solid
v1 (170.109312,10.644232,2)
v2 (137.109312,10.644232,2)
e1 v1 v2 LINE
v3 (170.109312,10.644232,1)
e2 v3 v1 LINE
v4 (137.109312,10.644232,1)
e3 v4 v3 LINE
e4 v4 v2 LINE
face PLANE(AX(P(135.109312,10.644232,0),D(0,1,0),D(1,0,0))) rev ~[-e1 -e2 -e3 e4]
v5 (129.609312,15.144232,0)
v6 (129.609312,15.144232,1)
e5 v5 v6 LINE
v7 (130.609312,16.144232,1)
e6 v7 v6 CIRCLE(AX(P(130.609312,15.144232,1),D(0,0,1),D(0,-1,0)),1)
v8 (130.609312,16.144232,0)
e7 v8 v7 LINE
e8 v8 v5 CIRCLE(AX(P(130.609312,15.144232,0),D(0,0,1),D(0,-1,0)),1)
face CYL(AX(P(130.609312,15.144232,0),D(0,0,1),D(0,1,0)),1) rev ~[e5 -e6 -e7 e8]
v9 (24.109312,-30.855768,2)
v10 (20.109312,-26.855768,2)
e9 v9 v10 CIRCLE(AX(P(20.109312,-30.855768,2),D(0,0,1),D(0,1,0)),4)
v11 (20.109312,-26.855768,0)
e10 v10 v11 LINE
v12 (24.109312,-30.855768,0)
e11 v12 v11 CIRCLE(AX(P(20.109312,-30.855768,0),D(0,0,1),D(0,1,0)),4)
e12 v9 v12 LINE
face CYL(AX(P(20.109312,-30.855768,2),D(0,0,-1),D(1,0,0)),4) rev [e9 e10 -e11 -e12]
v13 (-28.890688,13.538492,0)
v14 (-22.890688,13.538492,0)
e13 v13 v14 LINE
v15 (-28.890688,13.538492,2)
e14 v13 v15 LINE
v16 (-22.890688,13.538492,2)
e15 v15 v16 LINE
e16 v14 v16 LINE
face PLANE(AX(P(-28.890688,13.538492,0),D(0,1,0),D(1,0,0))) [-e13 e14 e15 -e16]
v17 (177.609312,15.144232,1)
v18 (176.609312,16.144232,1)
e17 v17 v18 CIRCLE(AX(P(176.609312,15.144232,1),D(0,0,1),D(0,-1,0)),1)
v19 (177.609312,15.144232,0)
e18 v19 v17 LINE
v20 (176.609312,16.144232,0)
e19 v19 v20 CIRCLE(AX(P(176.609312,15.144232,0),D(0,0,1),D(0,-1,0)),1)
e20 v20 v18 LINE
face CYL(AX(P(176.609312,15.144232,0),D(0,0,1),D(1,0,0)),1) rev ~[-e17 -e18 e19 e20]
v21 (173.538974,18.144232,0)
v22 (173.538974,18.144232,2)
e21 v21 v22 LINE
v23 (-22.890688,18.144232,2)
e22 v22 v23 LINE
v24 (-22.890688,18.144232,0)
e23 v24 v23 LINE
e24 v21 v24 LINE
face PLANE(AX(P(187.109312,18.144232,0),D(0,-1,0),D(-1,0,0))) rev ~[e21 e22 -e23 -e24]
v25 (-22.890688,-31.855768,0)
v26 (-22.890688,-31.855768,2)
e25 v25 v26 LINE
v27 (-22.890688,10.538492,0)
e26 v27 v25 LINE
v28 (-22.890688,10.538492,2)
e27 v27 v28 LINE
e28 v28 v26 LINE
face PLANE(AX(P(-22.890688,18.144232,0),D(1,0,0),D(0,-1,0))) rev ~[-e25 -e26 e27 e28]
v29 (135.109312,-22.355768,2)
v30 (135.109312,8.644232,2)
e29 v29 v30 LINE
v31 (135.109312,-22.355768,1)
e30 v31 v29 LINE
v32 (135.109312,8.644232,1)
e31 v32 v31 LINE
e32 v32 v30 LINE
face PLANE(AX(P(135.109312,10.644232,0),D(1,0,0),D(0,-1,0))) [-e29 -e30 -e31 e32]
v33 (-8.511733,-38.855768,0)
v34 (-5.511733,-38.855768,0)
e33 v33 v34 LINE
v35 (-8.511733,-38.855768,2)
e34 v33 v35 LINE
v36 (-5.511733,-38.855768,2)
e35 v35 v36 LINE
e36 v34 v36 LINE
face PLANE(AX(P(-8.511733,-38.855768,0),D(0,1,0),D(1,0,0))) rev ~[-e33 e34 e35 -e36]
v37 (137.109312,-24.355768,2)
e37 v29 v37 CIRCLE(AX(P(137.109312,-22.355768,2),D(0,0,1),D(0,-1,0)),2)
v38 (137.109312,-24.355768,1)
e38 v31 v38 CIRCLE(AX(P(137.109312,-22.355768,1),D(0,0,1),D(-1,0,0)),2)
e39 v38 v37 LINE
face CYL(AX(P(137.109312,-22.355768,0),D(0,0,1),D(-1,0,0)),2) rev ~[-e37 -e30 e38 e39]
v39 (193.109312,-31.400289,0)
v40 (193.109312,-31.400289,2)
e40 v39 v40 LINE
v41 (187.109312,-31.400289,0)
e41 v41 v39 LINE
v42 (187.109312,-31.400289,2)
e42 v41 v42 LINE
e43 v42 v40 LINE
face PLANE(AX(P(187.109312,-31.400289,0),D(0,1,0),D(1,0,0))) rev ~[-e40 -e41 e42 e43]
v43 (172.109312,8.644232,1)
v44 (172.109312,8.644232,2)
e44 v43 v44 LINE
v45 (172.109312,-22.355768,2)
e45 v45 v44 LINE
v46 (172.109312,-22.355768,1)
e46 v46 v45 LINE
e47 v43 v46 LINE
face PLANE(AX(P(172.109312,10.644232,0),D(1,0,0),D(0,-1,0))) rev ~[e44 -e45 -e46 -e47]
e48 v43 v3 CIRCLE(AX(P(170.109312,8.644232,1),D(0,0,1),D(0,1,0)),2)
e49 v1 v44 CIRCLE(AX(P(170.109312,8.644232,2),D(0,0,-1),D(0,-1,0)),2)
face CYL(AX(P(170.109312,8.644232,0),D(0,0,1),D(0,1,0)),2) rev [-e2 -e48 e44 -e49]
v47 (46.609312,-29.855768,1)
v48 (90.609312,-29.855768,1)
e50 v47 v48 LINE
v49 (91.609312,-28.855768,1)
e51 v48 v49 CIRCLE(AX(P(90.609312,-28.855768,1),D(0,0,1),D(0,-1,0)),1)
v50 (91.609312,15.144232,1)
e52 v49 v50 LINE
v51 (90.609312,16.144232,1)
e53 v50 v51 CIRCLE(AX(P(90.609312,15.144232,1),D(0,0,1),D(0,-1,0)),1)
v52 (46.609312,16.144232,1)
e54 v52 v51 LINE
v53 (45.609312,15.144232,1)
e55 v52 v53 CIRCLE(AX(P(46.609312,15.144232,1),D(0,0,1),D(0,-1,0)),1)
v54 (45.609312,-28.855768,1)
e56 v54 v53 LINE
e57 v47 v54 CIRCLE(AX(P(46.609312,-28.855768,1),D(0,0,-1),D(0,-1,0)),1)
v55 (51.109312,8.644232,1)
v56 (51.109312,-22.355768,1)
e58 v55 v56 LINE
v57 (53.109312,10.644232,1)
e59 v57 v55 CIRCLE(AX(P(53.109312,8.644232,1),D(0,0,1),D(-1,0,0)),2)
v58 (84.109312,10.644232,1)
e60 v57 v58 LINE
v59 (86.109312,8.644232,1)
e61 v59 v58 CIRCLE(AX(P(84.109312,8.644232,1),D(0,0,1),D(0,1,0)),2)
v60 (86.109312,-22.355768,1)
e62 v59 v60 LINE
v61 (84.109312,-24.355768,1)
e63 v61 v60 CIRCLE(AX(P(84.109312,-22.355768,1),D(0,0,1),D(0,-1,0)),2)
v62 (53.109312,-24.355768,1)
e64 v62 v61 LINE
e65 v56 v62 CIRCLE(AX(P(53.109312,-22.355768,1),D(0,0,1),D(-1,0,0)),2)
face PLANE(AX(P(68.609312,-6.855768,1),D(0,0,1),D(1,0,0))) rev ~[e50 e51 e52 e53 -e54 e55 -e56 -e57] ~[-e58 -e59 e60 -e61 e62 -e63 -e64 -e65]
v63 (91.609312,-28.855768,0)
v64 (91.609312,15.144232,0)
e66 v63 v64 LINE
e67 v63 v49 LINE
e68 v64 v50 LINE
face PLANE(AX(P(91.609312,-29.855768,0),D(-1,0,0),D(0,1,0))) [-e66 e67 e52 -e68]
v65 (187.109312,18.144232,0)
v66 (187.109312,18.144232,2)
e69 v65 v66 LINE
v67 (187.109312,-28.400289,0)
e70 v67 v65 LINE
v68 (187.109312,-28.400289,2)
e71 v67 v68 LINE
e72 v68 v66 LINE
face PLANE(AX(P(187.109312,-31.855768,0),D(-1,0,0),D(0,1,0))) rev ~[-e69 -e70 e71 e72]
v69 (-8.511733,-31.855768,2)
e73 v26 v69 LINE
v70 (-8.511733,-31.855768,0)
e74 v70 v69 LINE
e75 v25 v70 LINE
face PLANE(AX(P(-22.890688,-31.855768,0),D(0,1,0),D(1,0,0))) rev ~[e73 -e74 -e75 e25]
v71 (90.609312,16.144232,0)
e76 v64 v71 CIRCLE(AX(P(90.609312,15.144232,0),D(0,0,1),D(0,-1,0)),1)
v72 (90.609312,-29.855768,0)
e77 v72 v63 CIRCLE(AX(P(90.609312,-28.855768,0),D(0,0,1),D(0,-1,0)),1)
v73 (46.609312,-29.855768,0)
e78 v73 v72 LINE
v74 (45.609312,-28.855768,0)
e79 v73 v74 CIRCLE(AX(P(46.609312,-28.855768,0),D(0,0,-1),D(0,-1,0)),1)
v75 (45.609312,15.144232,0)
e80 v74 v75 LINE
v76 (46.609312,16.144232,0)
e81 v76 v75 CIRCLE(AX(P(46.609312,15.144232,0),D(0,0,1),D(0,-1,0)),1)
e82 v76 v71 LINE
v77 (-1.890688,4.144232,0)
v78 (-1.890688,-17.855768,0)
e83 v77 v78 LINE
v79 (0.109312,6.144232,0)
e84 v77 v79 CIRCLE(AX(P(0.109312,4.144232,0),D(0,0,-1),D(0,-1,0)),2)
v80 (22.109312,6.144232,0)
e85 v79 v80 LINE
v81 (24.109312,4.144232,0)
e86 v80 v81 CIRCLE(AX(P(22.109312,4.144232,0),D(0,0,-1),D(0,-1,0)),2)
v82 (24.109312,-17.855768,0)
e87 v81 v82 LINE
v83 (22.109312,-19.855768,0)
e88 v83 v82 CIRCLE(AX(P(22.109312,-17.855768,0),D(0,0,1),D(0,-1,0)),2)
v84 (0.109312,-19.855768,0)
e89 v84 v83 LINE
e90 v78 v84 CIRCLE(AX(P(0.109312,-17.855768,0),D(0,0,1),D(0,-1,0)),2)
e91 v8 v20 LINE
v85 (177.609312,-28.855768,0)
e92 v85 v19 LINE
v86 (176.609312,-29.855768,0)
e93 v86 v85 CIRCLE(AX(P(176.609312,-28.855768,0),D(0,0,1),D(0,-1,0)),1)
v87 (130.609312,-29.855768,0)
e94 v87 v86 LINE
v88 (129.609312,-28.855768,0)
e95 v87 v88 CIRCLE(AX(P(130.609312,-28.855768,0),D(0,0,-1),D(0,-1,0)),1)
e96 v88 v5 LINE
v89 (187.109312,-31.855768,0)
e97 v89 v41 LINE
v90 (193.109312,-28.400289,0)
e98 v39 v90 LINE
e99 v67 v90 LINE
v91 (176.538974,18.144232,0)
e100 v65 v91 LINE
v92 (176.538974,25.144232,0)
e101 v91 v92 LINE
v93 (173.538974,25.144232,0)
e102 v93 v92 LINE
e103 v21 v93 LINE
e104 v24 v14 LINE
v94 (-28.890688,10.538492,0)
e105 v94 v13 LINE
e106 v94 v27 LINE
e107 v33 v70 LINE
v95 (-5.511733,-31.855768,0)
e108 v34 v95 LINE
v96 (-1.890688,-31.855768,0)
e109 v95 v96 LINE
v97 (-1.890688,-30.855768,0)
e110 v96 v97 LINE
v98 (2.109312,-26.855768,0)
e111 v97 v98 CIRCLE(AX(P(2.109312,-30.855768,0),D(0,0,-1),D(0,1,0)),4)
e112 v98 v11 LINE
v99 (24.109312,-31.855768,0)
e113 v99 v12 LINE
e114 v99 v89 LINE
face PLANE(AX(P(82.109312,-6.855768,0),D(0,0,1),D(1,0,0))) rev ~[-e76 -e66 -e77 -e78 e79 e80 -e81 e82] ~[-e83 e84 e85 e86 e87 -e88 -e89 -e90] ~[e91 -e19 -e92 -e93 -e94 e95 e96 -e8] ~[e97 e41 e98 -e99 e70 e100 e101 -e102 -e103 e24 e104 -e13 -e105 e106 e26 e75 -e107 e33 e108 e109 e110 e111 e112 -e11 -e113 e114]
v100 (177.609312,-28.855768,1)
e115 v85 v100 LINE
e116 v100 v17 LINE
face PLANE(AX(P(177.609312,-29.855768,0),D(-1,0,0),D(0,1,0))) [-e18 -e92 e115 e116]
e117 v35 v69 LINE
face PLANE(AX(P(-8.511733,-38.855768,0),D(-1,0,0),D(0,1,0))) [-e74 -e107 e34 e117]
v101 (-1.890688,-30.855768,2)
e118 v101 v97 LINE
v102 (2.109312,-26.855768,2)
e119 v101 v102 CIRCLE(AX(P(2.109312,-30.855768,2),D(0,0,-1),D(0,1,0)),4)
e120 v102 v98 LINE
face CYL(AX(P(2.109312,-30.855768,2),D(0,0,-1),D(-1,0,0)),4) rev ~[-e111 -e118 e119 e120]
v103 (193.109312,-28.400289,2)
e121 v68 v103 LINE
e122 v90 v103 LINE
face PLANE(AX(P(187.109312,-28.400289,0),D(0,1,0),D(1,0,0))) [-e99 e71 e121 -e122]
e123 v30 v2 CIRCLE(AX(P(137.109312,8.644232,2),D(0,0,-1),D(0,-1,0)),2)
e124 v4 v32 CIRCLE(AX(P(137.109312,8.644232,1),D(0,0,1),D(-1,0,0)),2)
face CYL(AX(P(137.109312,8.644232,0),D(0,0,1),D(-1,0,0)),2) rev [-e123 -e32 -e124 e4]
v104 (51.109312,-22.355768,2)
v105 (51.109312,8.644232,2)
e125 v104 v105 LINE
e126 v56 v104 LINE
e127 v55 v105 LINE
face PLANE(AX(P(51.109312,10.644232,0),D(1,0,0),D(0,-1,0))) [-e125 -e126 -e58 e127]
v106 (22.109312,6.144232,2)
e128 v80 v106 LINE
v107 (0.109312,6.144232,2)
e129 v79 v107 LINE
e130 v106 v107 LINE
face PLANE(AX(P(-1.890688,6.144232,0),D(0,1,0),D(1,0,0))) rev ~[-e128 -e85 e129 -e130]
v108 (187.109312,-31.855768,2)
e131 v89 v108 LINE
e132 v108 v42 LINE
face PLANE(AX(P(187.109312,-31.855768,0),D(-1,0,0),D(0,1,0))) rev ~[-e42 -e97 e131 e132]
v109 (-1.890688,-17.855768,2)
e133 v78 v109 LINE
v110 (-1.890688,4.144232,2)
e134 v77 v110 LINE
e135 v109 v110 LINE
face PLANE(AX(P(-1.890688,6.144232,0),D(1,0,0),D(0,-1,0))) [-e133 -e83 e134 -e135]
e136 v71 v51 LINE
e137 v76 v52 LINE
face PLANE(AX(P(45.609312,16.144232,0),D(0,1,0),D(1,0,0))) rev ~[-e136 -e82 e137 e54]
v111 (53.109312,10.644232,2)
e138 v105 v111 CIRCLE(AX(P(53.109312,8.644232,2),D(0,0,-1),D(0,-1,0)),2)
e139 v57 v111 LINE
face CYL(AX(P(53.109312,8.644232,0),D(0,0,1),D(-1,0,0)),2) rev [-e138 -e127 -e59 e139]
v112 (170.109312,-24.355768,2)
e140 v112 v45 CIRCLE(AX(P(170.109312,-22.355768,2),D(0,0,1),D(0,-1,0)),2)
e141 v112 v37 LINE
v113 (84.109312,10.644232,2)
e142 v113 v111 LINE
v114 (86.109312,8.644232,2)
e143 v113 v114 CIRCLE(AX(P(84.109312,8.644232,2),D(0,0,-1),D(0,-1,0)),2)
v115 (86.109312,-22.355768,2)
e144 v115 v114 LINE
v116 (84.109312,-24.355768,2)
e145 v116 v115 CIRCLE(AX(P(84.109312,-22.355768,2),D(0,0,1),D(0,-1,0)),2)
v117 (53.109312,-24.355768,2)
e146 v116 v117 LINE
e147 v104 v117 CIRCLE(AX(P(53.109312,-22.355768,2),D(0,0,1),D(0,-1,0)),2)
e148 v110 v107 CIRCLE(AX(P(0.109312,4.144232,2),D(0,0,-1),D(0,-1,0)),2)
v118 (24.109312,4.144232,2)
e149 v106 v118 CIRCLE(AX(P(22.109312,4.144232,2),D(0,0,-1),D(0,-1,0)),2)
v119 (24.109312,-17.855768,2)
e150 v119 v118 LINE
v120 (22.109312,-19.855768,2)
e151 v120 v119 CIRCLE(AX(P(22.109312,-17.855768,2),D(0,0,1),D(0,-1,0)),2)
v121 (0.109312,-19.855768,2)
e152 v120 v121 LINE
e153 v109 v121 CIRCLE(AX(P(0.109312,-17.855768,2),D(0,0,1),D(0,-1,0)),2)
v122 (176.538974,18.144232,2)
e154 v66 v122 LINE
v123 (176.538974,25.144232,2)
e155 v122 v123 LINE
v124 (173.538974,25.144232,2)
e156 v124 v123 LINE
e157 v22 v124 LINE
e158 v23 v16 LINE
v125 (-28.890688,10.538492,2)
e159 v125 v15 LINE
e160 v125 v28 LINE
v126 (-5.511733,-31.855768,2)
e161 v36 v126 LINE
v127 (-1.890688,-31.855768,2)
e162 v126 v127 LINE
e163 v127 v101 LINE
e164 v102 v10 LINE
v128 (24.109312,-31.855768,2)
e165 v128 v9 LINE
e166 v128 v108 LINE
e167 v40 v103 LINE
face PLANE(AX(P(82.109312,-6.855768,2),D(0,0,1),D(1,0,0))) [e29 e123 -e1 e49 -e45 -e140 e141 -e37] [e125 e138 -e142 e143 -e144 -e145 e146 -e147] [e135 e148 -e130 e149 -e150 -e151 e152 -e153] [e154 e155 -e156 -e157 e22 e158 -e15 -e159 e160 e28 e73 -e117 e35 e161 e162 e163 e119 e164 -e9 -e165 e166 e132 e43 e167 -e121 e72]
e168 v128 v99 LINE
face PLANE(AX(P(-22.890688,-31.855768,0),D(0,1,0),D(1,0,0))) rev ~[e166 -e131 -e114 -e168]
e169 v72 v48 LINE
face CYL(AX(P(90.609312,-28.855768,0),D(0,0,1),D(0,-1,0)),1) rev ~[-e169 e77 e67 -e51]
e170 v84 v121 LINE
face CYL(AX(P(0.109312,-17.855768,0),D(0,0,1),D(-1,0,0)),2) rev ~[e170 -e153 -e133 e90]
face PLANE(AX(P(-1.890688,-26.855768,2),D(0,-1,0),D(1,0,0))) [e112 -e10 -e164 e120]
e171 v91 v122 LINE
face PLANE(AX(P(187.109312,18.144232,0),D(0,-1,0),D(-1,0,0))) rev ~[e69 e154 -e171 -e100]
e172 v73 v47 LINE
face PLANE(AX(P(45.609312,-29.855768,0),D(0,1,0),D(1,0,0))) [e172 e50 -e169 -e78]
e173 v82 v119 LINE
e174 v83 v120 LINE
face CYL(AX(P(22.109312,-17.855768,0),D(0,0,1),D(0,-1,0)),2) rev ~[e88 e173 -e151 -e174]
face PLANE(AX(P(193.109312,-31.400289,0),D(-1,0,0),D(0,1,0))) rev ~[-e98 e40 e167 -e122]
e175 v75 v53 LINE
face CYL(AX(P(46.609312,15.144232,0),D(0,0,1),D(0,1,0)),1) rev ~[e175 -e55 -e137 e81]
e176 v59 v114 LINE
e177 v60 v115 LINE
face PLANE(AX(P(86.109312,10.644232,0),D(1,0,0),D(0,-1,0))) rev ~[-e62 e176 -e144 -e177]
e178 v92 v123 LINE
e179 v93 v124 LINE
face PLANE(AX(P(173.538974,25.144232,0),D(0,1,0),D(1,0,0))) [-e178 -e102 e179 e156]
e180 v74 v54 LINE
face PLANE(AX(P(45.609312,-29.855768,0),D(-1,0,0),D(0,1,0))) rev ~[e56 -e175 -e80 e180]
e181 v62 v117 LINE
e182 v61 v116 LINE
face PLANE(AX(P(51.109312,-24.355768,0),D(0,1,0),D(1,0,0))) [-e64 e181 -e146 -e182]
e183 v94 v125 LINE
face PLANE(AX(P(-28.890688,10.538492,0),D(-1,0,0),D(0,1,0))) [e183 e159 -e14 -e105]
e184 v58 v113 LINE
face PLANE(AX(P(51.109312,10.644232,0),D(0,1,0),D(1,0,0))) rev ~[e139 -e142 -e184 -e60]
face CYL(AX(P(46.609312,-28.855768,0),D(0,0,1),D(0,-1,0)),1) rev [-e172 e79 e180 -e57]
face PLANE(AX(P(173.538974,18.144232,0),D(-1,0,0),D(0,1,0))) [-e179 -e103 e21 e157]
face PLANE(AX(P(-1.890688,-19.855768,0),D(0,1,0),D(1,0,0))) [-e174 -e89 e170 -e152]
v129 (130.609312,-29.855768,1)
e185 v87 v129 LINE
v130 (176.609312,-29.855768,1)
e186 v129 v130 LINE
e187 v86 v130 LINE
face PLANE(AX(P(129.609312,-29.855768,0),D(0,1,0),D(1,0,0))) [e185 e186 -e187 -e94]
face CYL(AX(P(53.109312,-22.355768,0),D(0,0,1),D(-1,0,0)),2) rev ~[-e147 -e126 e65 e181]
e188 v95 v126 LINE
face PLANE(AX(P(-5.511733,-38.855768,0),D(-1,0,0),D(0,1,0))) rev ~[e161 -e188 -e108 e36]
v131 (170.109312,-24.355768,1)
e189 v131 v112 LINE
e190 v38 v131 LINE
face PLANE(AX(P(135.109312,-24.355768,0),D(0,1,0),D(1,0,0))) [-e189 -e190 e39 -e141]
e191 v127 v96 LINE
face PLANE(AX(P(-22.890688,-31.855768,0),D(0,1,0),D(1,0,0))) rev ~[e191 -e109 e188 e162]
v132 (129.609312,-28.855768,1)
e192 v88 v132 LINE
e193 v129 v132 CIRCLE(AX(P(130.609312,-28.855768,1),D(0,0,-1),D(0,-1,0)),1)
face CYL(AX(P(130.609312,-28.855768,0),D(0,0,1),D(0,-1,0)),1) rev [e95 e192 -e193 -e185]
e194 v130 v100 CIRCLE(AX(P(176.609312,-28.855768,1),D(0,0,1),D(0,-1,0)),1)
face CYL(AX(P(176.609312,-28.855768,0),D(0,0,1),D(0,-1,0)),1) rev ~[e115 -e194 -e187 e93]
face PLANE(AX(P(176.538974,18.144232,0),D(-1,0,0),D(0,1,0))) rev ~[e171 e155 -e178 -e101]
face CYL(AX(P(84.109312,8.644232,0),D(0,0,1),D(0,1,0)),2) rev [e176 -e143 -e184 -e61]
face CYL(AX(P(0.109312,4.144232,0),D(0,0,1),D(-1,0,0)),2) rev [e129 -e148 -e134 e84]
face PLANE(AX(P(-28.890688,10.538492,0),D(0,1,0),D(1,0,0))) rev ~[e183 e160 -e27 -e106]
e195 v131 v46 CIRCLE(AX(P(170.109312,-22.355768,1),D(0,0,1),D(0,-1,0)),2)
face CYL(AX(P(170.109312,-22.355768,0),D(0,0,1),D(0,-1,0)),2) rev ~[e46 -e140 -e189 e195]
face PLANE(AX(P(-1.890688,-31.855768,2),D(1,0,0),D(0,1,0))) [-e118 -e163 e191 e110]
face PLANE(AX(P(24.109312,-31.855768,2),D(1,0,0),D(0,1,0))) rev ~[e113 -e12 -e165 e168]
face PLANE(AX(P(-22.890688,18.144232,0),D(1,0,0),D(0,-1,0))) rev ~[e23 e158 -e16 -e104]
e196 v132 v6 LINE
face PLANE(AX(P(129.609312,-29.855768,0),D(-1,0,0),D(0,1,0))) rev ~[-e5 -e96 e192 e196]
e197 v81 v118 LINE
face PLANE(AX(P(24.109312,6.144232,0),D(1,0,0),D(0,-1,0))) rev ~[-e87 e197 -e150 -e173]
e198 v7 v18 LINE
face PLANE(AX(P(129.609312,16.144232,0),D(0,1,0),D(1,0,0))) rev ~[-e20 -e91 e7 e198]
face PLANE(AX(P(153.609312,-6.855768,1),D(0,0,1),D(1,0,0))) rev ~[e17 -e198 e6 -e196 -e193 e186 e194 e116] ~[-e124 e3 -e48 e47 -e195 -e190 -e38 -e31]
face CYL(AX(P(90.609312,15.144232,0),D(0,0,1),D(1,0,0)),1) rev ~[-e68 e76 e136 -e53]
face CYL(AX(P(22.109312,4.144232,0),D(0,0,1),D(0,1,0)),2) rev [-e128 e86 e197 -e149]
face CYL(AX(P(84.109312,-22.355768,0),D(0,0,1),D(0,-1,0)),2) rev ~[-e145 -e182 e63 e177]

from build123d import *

# Parameters (mm, degrees)
F1_DEPTH  = 2
F2_W      = 26
F2_H      = 26
F3_DEPTH  = 15.4
F4_W      = 35
F4_H      = 35
F4_W_2    = 37
F5_DEPTH  = 25
F6_W      = 26
F6_H      = 5
F7_DEPTH  = 25
F8_R      = 4
F9_R      = 2
F10_W     = 46
F10_H     = 46
F10_W_2   = 48
F11_DEPTH = 1
F12_R     = 1
F13_R     = 1
F0_W      = 6
F0_H      = 3
F0_W_2    = 3
F0_H_2    = 7
F14_DEPTH = 2


# Not quite as in the source:
# - a feature names something its author has since deleted; it is built from what else it names


with BuildPart() as f1:
    # F0 (on Top) → F1 (new body)
    with BuildSketch(Plane.XY):
        Polygon((173.5389735401, 18.1442317292), (-22.8906879723, 18.1442317292), (-22.8906879723, 13.5384923518), (-22.8906879723, 10.5384923518), (-22.8906879723, -31.8557682708), (-8.5117332786, -31.8557682708), (-5.5117332786, -31.8557682708), (187.1093120277, -31.8557682708), (187.1093120277, -31.4002893865), (187.1093120277, -28.4002893865), (187.1093120277, 18.1442317292), (176.5389735401, 18.1442317292), align=None)
    extrude(amount=F1_DEPTH)

    # F2 (on face) → F3 (cut)
    with BuildSketch(Plane(origin=(0, 0, 0), x_dir=(1, 0, 0), z_dir=(0, 0, -1))):
        with Locations((11.1093120277, 6.8557682708)):
            Rectangle(F2_W, F2_H)
    extrude(amount=-F3_DEPTH, mode=Mode.SUBTRACT)

    # F4 (on face) → F5 (cut)
    with BuildSketch(Plane(origin=(0, 0, 0), x_dir=(1, 0, 0), z_dir=(0, 0, -1))):
        with Locations((68.6093120277, 6.8557682708)):
            Rectangle(F4_W, F4_H)
        with Locations((153.6093120277, 6.8557682708)):
            Rectangle(F4_W_2, F4_H)
    extrude(amount=-F5_DEPTH, mode=Mode.SUBTRACT)

    # F6 (on face) → F7 (cut)
    with BuildSketch(Plane.XY.offset(2)):
        with Locations((11.1093120277, -29.3557682708)):
            Rectangle(F6_W, F6_H)
    extrude(amount=-F7_DEPTH, mode=Mode.SUBTRACT)

    # F8
    f8_edges = [f1.edges().sort_by_distance(p)[0] for p in [
        (-1.890688, -26.855768, 1),
        (24.109312, -26.855768, 1),
    ]]
    fillet(f8_edges, radius=F8_R)

    # F9
    f9_edges = [f1.edges().sort_by_distance(p)[0] for p in [
        (51.109312, 10.644232, 1),
        (86.109312, 10.644232, 1),
        (51.109312, -24.355768, 1),
        (135.109312, -24.355768, 1),
        (86.109312, -24.355768, 1),
        (172.109312, -24.355768, 1),
        (135.109312, 10.644232, 1),
        (172.109312, 10.644232, 1),
        (24.109312, 6.144232, 1),
        (-1.890688, 6.144232, 1),
        (24.109312, -19.855768, 1),
        (-1.890688, -19.855768, 1),
    ]]
    fillet(f9_edges, radius=F9_R)

    # F10 (on face) → F11 (cut)
    with BuildSketch(Plane.XY):
        with Locations((68.6093120277, -6.8557682708)):
            Rectangle(F10_W, F10_H)
        with Locations((153.6093120277, -6.8557682708)):
            Rectangle(F10_W_2, F10_H)
    extrude(amount=F11_DEPTH, mode=Mode.SUBTRACT)

    # F12
    f12_edges = [f1.edges().sort_by_distance(p)[0] for p in [
        (45.609312, -29.855768, 0.5),
        (91.609312, -29.855768, 0.5),
        (91.609312, 16.144232, 0.5),
        (45.609312, 16.144232, 0.5),
    ]]
    fillet(f12_edges, radius=F12_R)

    # F13
    f13_edges = [f1.edges().sort_by_distance(p)[0] for p in [
        (129.609312, -29.855768, 0.5),
        (177.609312, -29.855768, 0.5),
        (177.609312, 16.144232, 0.5),
        (129.609312, 16.144232, 0.5),
    ]]
    fillet(f13_edges, radius=F13_R)

    # F0 (on Top) → F14 (join)
    with BuildSketch(Plane.XY):
        with Locations((190.1093120277, -29.9002893865)):
            Rectangle(F0_W, F0_H)
        with Locations((175.0389735401, 21.6442317292)):
            Rectangle(F0_W_2, F0_H_2)
        with Locations((-7.0117332786, -35.3557682708)):
            Rectangle(F0_W_2, F0_H_2)
        with Locations((-25.8906879723, 12.0384923518)):
            Rectangle(F0_W, F0_H)
    extrude(amount=F14_DEPTH)


solid = f1.part
